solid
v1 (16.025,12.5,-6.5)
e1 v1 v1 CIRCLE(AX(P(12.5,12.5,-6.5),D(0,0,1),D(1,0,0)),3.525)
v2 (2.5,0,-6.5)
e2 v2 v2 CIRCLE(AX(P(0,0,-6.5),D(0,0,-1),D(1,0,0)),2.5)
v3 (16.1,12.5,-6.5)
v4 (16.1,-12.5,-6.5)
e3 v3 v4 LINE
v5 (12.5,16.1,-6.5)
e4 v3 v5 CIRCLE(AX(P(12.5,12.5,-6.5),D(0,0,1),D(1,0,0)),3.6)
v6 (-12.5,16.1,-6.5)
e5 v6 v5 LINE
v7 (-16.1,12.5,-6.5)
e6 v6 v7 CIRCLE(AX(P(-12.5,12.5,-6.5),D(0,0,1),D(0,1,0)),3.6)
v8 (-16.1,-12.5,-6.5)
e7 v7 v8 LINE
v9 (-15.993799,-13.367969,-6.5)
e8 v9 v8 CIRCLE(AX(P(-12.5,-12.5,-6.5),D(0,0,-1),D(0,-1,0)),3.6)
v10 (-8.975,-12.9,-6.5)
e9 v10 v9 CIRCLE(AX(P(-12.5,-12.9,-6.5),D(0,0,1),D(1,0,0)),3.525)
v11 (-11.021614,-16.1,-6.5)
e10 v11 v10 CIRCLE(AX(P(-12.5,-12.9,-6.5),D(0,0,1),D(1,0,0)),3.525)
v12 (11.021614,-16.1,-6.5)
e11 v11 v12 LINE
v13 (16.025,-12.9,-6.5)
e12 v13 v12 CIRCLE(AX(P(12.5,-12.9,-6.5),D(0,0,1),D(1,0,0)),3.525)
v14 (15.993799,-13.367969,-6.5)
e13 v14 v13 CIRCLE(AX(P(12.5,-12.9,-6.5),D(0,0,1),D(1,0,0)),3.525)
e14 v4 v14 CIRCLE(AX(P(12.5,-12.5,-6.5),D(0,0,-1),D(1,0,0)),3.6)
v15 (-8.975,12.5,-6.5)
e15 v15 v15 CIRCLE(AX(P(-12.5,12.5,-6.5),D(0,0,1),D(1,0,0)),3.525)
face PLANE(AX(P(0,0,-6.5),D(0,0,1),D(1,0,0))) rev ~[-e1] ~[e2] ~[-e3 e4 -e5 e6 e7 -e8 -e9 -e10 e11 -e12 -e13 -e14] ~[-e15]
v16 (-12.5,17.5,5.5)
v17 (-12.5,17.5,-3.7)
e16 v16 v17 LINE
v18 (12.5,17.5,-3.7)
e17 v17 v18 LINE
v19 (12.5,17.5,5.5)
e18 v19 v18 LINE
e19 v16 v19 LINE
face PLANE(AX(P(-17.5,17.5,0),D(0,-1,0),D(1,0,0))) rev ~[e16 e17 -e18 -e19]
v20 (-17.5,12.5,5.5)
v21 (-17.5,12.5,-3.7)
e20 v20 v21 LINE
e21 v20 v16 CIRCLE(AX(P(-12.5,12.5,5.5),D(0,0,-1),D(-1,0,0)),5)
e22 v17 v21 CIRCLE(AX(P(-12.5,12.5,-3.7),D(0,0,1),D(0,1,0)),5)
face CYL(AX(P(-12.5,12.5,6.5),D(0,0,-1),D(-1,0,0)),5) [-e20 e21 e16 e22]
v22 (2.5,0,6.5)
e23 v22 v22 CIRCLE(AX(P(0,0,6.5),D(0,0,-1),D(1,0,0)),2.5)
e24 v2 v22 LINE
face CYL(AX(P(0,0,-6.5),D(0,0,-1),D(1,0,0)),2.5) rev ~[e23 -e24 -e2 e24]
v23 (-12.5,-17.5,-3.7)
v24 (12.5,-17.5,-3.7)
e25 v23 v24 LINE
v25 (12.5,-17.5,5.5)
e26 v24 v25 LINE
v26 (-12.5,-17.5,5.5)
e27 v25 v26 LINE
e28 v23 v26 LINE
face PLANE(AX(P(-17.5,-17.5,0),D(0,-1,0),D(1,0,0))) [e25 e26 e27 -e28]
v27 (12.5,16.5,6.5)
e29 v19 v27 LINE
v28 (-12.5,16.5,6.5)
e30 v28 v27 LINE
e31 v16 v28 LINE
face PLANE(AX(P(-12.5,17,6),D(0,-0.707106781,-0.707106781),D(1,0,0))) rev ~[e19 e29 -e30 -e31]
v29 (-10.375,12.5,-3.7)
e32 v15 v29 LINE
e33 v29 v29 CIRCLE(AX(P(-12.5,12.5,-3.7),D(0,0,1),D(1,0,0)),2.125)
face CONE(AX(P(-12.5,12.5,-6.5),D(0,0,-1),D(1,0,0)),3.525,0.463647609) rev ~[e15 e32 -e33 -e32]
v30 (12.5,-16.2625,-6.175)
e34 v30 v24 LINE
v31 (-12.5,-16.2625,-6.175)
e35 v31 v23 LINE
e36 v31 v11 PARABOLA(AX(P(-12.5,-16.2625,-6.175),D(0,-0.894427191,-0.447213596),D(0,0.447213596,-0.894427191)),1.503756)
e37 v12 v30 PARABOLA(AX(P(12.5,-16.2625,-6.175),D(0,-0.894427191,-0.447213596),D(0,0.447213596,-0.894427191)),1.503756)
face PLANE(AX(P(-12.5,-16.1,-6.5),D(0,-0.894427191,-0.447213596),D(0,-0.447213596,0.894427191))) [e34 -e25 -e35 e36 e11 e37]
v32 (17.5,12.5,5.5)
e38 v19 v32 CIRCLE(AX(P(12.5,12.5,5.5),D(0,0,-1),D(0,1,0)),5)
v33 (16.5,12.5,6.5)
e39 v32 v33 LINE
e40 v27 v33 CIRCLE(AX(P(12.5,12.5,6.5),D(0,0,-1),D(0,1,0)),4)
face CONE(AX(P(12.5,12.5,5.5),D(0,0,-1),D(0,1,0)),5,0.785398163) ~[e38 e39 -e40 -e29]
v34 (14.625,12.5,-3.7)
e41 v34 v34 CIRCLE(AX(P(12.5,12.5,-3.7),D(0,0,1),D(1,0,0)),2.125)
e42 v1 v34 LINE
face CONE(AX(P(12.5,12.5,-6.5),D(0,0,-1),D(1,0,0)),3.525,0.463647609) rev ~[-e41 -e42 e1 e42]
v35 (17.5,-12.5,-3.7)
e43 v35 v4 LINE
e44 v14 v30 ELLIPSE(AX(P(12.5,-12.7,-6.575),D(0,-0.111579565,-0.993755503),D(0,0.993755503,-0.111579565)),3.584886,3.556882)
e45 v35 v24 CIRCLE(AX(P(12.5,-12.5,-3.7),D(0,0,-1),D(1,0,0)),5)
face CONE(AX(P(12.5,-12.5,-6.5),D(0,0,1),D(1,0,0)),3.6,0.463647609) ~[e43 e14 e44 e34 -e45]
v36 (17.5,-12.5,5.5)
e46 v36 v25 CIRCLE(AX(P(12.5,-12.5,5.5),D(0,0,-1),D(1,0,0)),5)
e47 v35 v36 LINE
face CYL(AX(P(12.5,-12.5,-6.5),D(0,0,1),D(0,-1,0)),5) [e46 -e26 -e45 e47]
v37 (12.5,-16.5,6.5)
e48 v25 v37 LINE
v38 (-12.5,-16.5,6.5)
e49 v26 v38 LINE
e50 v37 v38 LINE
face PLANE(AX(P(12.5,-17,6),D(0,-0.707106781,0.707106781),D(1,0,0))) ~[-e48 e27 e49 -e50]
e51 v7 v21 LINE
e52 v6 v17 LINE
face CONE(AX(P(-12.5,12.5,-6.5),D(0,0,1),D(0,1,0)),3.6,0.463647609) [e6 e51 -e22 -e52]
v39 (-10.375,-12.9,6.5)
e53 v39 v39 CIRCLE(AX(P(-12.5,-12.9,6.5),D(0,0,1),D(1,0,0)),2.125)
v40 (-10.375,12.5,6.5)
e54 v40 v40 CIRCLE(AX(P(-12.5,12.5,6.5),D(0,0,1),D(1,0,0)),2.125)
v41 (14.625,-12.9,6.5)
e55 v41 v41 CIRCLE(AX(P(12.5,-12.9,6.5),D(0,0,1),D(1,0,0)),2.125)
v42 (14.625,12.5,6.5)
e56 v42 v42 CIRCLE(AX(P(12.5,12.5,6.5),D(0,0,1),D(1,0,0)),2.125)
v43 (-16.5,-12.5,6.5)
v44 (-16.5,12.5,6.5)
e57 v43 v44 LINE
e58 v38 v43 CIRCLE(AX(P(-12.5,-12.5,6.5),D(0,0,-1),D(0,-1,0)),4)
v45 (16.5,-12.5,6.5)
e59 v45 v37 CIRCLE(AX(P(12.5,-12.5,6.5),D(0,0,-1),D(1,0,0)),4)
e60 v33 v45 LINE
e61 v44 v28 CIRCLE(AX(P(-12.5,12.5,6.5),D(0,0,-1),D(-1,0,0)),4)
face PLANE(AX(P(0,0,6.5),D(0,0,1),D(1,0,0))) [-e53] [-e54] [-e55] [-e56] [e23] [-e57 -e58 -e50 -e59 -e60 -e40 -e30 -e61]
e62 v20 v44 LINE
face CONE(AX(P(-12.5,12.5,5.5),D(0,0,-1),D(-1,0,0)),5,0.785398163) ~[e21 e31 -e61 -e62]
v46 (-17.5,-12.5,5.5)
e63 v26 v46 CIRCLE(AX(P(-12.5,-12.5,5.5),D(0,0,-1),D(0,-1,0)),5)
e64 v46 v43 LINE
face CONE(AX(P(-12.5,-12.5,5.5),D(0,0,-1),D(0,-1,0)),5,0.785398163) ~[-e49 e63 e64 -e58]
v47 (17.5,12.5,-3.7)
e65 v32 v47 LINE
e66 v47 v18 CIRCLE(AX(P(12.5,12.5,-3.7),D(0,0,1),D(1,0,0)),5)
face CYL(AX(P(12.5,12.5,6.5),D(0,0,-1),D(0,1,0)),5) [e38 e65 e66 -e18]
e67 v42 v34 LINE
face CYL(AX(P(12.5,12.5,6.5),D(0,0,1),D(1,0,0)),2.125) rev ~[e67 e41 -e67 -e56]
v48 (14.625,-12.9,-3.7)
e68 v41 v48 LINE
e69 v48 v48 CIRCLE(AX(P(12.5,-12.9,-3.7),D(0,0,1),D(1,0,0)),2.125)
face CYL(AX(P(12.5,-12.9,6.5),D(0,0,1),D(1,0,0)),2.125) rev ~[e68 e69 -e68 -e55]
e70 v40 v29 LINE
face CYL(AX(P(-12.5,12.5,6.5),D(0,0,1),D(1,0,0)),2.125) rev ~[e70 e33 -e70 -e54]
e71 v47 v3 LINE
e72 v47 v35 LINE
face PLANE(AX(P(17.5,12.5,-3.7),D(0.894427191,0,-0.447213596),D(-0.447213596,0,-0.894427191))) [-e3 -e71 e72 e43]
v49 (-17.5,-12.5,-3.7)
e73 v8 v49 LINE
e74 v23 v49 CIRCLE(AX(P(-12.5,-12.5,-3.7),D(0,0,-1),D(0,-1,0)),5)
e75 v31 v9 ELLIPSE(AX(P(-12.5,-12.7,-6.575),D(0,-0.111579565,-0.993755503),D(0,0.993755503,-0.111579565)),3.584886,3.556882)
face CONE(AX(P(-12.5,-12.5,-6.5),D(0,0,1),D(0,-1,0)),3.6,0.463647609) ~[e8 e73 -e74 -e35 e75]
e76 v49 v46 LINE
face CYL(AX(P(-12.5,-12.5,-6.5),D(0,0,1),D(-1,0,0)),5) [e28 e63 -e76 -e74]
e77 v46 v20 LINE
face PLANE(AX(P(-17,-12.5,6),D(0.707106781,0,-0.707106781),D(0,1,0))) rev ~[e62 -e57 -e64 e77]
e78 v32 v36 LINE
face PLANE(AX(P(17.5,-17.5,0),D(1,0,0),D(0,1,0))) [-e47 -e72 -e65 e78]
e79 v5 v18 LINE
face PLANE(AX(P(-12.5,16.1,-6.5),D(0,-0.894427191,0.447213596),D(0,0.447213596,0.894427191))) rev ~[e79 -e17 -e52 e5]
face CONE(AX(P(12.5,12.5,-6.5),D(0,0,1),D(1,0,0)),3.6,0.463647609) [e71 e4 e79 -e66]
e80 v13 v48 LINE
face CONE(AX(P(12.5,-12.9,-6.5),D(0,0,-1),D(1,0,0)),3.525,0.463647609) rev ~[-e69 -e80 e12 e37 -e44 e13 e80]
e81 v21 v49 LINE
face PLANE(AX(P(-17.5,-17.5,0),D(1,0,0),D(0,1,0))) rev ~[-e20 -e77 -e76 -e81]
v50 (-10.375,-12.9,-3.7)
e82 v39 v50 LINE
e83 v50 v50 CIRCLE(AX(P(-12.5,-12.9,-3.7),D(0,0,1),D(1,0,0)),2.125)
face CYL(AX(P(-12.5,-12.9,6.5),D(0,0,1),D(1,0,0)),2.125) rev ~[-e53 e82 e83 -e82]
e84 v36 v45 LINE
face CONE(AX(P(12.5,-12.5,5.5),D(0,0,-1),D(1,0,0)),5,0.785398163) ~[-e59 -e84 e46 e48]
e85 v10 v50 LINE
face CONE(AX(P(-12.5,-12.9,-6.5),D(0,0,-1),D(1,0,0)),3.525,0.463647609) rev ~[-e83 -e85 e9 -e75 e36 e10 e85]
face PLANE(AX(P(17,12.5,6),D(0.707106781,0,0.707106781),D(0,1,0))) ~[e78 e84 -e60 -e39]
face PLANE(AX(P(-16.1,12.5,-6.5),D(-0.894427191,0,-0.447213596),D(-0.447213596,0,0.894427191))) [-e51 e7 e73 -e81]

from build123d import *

# Parameters (mm, degrees)
F0_W         = 35
F0_H         = 35
F1_DEPTH     = 6.5
F2_R         = 2.125
F3_DEPTH     = 13.001
F4_R         = 5
F5_T1_DEPTH  = 25
F5_T3_DEPTH  = 25
F5_T12_ANGLE = 90
F5_T14_ANGLE = 90
F5_T16_ANGLE = 90
F5_T18_ANGLE = 90
F6_R         = 2.5
F7_DEPTH     = 13.001
F8_SIZE      = 1


# Not quite as in the source:
# - a fillet or chamfer that OpenCascade refuses, or shapes differently, is made with other operations: its cross-section is extruded or revolved along the edge and cut away or added


with BuildPart() as f1:
    # F0 (on Top) → F1 (new body, symmetric)
    with BuildSketch(Plane.XY):
        Rectangle(F0_W, F0_H)
    extrude(amount=F1_DEPTH, both=True)

    # F2 (on face) → F3 (cut, through all)
    with BuildSketch(Plane.XY.offset(6.5)):
        with Locations((-12.5, -12.9)):
            Circle(F2_R)
        with Locations((-12.5, 12.5)):
            Circle(F2_R)
        with Locations((12.5, 12.5)):
            Circle(F2_R)
        with Locations((12.5, -12.9)):
            Circle(F2_R)
    extrude(amount=-F3_DEPTH, mode=Mode.SUBTRACT)

    # F4
    f4_edges = [f1.edges().sort_by_distance(p)[0] for p in [
        (-17.5, 17.5, 0),
        (17.5, 17.5, 0),
        (17.5, -17.5, 0),
        (-17.5, -17.5, 0),
    ]]
    fillet(f4_edges, radius=F4_R)

    # F5: chamfer of 1.4 x 2.8 on 12 edges, made by hand

    # F5_s2 → F5_t1 (cut)
    with BuildSketch(Plane.XZ.offset(-12.5)):
        Polygon((17.5, -3.7), (16.1, -6.5), (17.5, -6.5), align=None)
        Polygon((-16.1, -6.5), (-17.5, -3.7), (-17.5, -6.5), align=None)
    extrude(amount=F5_T1_DEPTH, mode=Mode.SUBTRACT)

    # F5_s4 → F5_t3 (cut)
    with BuildSketch(Plane.YZ.offset(-12.5)):
        Polygon((-16.1, -6.5), (-17.5, -3.7), (-17.5, -6.5), align=None)
        Polygon((16.1, -6.5), (17.5, -3.7), (17.5, -6.5), align=None)
    extrude(amount=F5_T3_DEPTH, mode=Mode.SUBTRACT)

    # F5_s5 → F5_t6 (revolve, cut)
    with BuildSketch(Plane.XZ.offset(12.9)):
        Polygon((-8.975, -6.5), (-10.375, -3.7), (-10.375, -6.5), align=None)
    revolve(axis=Axis((-12.5, -12.9, -6.5), (0, 0, 1)), mode=Mode.SUBTRACT)

    # F5_s7 → F5_t8 (revolve, cut)
    with BuildSketch(Plane.XZ.offset(12.9)):
        Polygon((16.025, -6.5), (14.625, -3.7), (14.625, -6.5), align=None)
    revolve(axis=Axis((12.5, -12.9, -6.5), (0, 0, 1)), mode=Mode.SUBTRACT)

    # F5_s9 → F5_t10 (revolve, cut)
    with BuildSketch(Plane.XZ.offset(-12.5)):
        Polygon((16.025, -6.5), (14.625, -3.7), (14.625, -6.5), align=None)
    revolve(axis=Axis((12.5, 12.5, -6.5), (0, 0, 1)), mode=Mode.SUBTRACT)

    # F5_s11 → F5_t12 (revolve, cut)
    with BuildSketch(Plane.XZ.offset(12.5)):
        Polygon((16.1, -6.5), (17.5, -3.7), (17.5, -6.5), align=None)
    revolve(axis=Axis((12.5, -12.5, -6.5), (0, 0, -1)), revolution_arc=F5_T12_ANGLE, mode=Mode.SUBTRACT)

    # F5_s13 → F5_t14 (revolve, cut)
    with BuildSketch(Plane.XZ.offset(-12.5)):
        Polygon((16.1, -6.5), (17.5, -3.7), (17.5, -6.5), align=None)
    revolve(axis=Axis((12.5, 12.5, -6.5), (0, 0, 1)), revolution_arc=F5_T14_ANGLE, mode=Mode.SUBTRACT)

    # F5_s15 → F5_t16 (revolve, cut)
    with BuildSketch(Plane.YZ.offset(-12.5)):
        Polygon((-16.1, -6.5), (-17.5, -3.7), (-17.5, -6.5), align=None)
    revolve(axis=Axis((-12.5, -12.5, -6.5), (0, 0, -1)), revolution_arc=F5_T16_ANGLE, mode=Mode.SUBTRACT)

    # F5_s17 → F5_t18 (revolve, cut)
    with BuildSketch(Plane.YZ.offset(-12.5)):
        Polygon((16.1, -6.5), (17.5, -3.7), (17.5, -6.5), align=None)
    revolve(axis=Axis((-12.5, 12.5, -6.5), (0, 0, 1)), revolution_arc=F5_T18_ANGLE, mode=Mode.SUBTRACT)

    # F5_s19 → F5_t20 (revolve, cut)
    with BuildSketch(Plane.XZ.offset(-12.5)):
        Polygon((-8.975, -6.5), (-10.375, -3.7), (-10.375, -6.5), align=None)
    revolve(axis=Axis((-12.5, 12.5, -6.5), (0, 0, 1)), mode=Mode.SUBTRACT)

    # F6 (on face) → F7 (cut, through all)
    with BuildSketch(Plane(origin=(0, 0, -6.5), x_dir=(1, 0, 0), z_dir=(0, 0, -1))):
        Circle(F6_R)
    extrude(amount=-F7_DEPTH, mode=Mode.SUBTRACT)

    # F8
    f8_edges = [f1.edges().sort_by_distance(p)[0] for p in [
        (-17.5, 0, 6.5),
    ]]
    chamfer(f8_edges, length=F8_SIZE)


solid = f1.part
